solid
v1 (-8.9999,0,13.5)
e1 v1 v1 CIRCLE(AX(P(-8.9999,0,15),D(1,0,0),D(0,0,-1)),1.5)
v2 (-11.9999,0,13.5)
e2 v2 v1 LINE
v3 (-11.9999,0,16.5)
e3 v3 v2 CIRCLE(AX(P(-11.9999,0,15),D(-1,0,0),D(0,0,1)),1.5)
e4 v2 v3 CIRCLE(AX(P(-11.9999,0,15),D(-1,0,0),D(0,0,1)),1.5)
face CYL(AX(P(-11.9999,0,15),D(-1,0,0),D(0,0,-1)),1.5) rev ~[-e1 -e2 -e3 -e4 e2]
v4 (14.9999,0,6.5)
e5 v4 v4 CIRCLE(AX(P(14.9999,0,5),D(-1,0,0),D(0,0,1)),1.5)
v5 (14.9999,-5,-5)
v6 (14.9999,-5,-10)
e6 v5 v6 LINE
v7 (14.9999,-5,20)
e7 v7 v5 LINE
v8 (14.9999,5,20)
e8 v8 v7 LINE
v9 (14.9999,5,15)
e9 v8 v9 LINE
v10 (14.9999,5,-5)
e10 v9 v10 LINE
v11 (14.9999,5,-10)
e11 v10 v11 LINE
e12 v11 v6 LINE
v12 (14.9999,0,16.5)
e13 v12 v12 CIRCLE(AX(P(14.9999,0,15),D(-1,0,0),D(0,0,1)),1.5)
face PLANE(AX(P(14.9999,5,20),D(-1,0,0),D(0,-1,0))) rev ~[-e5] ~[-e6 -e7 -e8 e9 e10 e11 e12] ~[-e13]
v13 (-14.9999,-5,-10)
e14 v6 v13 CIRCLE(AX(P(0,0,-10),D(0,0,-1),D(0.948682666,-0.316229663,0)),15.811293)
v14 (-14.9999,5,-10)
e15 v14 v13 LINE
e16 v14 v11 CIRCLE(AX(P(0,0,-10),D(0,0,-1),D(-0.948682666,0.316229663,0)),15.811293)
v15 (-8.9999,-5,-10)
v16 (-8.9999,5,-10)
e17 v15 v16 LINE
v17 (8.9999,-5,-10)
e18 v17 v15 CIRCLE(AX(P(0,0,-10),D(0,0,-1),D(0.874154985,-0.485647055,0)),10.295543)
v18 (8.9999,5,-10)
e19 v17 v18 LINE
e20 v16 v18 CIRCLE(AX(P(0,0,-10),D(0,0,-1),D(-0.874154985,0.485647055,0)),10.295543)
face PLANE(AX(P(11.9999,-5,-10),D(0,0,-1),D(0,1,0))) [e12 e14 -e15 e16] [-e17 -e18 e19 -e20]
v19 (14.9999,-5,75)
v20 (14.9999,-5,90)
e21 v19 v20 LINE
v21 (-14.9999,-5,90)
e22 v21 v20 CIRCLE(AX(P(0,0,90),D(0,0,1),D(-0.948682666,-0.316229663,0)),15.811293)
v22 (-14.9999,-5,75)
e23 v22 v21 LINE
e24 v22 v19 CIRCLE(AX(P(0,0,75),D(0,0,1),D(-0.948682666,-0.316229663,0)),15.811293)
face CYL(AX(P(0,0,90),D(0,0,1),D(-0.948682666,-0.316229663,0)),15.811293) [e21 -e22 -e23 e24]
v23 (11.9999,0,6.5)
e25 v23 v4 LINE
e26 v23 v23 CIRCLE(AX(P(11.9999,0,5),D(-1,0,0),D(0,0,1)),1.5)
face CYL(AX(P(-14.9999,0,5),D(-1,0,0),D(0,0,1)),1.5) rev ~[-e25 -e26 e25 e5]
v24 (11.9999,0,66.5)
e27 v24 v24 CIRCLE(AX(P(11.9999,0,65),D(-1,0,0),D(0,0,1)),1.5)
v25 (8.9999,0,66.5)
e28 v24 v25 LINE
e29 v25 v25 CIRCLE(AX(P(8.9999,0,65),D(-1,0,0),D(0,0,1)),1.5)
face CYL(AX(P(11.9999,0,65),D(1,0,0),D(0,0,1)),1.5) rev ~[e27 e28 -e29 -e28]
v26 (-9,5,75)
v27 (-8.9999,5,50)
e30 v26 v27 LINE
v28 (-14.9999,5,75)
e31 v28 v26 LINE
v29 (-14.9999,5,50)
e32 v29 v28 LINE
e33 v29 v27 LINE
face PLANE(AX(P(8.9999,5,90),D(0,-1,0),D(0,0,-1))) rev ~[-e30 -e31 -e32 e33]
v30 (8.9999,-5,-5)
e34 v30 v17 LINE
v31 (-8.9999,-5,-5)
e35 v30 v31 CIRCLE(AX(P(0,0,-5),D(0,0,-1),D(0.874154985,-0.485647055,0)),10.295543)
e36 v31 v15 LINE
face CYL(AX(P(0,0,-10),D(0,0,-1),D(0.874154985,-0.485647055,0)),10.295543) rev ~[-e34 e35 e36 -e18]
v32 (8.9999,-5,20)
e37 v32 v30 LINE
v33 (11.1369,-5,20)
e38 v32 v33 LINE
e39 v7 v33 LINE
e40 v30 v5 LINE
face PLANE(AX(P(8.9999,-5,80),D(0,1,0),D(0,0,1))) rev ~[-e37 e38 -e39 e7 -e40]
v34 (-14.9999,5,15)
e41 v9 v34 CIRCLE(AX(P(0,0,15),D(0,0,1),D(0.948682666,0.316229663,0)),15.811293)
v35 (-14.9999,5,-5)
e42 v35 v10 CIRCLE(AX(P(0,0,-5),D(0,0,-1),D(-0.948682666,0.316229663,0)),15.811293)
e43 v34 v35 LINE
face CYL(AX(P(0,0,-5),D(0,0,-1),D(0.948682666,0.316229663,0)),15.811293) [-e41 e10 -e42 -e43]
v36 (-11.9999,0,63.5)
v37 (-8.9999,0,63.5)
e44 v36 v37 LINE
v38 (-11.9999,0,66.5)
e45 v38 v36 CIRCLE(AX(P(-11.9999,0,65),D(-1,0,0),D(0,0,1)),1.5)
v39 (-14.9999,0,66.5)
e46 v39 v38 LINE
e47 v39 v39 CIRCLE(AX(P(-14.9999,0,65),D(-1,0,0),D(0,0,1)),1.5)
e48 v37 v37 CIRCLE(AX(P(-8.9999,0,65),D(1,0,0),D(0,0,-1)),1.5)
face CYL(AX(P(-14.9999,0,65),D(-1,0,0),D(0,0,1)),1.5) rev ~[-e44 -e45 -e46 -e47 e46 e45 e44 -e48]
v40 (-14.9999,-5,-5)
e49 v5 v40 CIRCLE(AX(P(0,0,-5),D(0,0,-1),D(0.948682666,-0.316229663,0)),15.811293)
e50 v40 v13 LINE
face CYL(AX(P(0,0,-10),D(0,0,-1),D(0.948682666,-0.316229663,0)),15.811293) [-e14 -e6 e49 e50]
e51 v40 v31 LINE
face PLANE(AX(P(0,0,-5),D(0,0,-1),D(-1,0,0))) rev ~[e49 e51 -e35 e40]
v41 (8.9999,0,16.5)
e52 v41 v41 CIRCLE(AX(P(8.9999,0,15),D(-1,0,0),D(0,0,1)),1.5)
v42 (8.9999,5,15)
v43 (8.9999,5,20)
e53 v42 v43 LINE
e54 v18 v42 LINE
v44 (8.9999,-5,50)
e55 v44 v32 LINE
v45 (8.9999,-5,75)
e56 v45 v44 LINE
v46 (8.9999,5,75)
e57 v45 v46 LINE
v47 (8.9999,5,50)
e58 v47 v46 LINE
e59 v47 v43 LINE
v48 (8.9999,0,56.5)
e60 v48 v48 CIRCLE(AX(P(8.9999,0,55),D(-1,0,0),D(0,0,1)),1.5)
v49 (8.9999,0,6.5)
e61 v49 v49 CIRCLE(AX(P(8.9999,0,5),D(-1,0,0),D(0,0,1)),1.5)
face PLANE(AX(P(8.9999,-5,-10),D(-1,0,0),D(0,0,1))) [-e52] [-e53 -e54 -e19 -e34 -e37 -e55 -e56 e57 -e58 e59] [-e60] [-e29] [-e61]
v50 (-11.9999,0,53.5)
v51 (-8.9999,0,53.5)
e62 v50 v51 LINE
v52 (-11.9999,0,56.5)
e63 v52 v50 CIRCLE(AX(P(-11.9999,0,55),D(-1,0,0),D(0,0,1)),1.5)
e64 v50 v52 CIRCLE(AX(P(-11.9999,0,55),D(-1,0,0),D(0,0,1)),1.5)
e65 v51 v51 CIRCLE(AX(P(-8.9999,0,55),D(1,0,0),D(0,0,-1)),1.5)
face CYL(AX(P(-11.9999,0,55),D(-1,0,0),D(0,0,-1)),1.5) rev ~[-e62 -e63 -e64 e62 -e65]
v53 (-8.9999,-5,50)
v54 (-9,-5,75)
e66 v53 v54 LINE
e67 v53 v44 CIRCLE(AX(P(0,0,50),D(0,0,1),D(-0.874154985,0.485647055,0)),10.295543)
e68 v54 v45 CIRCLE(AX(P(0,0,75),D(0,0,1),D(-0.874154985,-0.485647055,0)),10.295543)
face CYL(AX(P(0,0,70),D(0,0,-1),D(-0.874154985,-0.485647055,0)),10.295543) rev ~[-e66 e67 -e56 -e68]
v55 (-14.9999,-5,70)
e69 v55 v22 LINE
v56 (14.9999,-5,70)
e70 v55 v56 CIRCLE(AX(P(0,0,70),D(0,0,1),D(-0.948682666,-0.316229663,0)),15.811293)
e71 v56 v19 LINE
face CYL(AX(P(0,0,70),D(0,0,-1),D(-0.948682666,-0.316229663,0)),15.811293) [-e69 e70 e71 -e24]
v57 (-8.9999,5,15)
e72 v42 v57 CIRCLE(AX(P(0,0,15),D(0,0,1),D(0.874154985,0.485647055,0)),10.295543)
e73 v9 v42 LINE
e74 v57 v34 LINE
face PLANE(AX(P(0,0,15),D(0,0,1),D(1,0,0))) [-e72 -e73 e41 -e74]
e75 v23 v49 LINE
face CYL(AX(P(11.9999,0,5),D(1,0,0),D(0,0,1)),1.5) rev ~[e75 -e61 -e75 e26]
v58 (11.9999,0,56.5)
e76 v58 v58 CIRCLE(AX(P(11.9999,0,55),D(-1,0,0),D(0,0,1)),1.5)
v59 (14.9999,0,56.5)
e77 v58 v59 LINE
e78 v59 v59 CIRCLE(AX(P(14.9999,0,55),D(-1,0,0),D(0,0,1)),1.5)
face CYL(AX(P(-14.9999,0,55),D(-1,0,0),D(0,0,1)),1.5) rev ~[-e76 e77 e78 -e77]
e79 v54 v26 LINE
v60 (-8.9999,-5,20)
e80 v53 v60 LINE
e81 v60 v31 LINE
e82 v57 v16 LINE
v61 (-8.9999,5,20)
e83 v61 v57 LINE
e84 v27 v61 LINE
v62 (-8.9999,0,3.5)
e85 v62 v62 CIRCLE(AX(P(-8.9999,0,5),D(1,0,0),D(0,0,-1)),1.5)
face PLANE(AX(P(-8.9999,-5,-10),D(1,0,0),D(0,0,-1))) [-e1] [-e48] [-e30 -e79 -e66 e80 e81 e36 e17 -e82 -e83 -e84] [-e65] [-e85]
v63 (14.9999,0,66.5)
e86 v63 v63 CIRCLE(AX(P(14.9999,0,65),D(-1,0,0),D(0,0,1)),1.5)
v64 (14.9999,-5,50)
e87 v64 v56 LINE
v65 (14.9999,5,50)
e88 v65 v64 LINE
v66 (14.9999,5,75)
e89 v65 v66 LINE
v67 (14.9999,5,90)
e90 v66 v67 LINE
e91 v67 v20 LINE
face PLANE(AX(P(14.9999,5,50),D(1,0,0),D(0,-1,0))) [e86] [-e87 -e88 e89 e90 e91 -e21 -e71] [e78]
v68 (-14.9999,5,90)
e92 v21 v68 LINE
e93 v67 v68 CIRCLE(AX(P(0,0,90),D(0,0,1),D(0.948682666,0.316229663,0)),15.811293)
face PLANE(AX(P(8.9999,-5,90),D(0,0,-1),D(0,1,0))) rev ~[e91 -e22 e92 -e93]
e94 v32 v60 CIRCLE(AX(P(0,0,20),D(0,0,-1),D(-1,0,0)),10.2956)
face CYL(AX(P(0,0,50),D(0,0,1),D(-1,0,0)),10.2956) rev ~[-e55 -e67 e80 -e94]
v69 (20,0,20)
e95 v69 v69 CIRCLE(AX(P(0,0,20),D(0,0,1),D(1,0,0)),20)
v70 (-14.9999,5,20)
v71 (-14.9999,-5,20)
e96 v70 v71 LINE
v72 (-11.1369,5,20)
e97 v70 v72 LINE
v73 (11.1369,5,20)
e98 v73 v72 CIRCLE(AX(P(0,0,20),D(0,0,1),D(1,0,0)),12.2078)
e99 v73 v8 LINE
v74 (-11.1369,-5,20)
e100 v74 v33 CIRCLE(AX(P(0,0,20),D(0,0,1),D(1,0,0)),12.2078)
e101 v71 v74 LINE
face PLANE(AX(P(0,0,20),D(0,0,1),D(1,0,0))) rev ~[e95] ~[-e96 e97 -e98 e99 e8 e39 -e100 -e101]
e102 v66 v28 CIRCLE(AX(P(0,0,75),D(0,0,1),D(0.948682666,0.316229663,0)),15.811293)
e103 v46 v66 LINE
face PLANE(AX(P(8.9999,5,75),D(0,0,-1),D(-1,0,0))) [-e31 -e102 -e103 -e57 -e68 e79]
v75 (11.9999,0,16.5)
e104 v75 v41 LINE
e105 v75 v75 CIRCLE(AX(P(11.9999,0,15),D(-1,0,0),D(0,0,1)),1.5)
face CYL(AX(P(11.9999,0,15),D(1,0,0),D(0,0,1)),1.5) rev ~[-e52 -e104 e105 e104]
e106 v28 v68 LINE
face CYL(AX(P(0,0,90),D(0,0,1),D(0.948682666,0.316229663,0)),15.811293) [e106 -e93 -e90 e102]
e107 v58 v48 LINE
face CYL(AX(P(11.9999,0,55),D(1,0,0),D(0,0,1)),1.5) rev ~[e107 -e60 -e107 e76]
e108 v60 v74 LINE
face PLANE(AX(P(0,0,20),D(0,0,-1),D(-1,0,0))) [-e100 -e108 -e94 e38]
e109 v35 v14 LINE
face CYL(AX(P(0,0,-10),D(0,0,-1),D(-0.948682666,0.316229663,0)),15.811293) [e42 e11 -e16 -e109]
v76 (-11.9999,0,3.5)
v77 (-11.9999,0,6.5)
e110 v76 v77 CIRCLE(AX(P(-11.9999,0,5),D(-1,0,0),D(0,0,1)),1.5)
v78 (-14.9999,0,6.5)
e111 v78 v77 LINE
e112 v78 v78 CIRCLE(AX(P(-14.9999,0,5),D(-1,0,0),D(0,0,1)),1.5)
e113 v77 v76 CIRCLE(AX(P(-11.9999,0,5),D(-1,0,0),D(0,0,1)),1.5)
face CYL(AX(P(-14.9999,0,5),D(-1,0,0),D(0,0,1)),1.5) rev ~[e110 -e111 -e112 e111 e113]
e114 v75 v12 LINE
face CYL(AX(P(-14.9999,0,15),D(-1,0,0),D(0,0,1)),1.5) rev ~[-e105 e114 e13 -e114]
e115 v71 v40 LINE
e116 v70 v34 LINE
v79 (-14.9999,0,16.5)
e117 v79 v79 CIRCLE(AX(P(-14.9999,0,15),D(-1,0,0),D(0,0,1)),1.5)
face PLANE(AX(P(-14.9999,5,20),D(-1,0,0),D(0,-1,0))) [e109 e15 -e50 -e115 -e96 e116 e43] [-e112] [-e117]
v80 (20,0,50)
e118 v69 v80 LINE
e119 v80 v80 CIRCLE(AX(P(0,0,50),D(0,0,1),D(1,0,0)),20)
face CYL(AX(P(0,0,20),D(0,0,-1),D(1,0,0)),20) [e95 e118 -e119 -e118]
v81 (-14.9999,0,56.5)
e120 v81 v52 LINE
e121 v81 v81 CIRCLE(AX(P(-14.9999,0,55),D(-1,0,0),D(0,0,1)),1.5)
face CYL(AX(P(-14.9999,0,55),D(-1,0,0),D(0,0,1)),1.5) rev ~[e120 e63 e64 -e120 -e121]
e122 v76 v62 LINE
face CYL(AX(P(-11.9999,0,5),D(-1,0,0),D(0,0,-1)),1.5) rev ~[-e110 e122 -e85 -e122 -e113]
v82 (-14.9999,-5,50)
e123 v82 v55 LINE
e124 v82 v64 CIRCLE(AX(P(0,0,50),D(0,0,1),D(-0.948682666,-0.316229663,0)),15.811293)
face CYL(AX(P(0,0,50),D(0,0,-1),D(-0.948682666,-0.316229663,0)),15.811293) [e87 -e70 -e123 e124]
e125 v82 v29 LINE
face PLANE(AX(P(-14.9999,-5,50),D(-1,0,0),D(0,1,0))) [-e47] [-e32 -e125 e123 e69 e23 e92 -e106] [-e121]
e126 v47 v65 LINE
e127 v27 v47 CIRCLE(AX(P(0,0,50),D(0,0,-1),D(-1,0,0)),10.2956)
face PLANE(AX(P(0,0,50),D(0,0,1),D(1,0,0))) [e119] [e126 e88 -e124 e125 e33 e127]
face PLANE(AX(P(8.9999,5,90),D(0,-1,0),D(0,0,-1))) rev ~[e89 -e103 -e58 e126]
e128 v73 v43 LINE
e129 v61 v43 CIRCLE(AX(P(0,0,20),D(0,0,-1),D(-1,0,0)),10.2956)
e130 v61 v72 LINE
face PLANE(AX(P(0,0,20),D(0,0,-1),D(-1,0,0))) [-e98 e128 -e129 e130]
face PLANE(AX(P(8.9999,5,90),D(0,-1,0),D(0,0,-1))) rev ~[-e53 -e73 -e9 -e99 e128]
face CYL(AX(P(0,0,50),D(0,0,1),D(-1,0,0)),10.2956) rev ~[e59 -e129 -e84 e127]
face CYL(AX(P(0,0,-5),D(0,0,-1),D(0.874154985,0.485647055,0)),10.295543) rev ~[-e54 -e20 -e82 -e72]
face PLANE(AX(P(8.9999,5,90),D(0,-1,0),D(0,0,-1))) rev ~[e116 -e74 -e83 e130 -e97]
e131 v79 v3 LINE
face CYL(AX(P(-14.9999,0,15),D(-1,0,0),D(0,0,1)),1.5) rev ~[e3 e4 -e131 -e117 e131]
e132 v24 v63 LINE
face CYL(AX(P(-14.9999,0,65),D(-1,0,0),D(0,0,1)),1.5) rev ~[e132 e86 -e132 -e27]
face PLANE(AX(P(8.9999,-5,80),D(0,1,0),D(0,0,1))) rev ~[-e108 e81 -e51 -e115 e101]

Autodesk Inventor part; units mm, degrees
ref_plane "YZ Plane" through (0, 0, 0) normal (1, 0, 0) x (0, 1, 0)
ref_plane "XZ Plane" through (0, 0, 0) normal (0, 1, 0) x (-1, 0, 0)
ref_plane "XY Plane" through (0, 0, 0) normal (0, 0, 1) x (1, 0, 0)
ref_plane "Work Plane2" through (0, 0, 20) normal (0, 0, 1) x (1, 0, 0)
sketch "Sketch3" plane through (0, 0, 20) normal (0, 0, 1) x (1, 0, 0)
  line L0 (-11.1369, 5) -> (-11.1369, -5)
  line L1 (-11.1369, 5) -> (-14.9999, 5)
  line L2 (-14.9999, 5) -> (-14.9999, -5)
  line L3 (-14.9999, -5) -> (-11.1369, -5)
  line L4 (-11.1369, -5) -> (-11.1369, 5)
  line L5 (11.1369, 5) -> (14.9999, 5)
  line L6 (14.9999, 5) -> (14.9999, -5)
  line L7 (14.9999, -5) -> (11.1369, -5)
  line L8 (11.1369, -5) -> (11.1369, 5)
  point P0 (0, 0)
  point P1 (0, 0)
  dimension "d9" = 3.863
  dimension "d10" = 3.863
extrude "Extrusion3" add sketch "Sketch3" against normal blind 30
sketch "Sketch4" plane through (-14.9999, -5, 20) normal (-1, 0, 0) x (0, 0, 1)
  line L0 (0, 5) -> (0, 0)
  circle A0 centre (-15, 5) radius 1.5
  circle A1 centre (-5, 5) radius 1.5
  point P0 (-20, 5)
  dimension "d13" = 5
  dimension "d14" = 5
  dimension "d17" = 3
  dimension "d18" = 3
extrude "Extrusion4" cut sketch "Sketch4" against normal blind 200
sketch "Sketch5" plane through (0, 0, 20) normal (0, 0, 1) x (1, 0, 0)
  circle A0 centre (0, 0) radius 20
  circle A1 centre (0, 0) radius 12.2078
  point P0 (-14.9999, 5)
  point P1 (-11.1369, -5)
  point P2 (11.1369, -5)
  point P3 (14.9999, 5)
  dimension "d21" = 40
extrude "Extrusion5" add sketch "Sketch5" along normal blind 30
sketch "Sketch6" plane through (0, 0, 20) normal (0, 0, 1) x (1, 0, 0)
  line L0 (-14.9999, -5) -> (-11.1369, -5) projected
  line L1 (-14.9999, 5) -> (-11.1369, 5) projected
  line L2 (-11.1369, -5) -> (-13.4979, -5)
  line L3 (-13.4979, -5) -> (-13.4979, 5)
  line L4 (-13.4979, 5) -> (-11.1369, 5)
  line L5 (-11.1369, 5) -> (-11.1369, -5)
  line L6 (11.1369, -5) -> (11.1369, 5) projected
  line L7 (11.1369, -5) -> (13.9529, -5)
  line L8 (13.9529, -5) -> (13.9529, 5)
  line L9 (13.9529, 5) -> (11.1369, 5)
  line L10 (11.1369, 5) -> (11.1369, -5)
  arc A0 (11.1369, 5) -> (-11.1369, 5) centre (0, 0) ccw projected
  arc A1 (-11.1369, -5) -> (11.1369, -5) centre (0, 0) ccw projected
  arc A2 (-11.1369, 5) -> (-11.1369, -5) centre (0, 0) ccw
  line L11 (14.9999, -5) -> (11.1369, -5) projected
  line L12 (11.1369, 5) -> (14.9999, 5) projected
  arc A3 (11.1369, -5) -> (11.1369, 5) centre (0, 0) ccw
extrude "Extrusion6" add sketch "Sketch6" along normal blind 30 contours A2 L5 | L6 A3
sketch "Sketch7" plane through (0, 0, 50) normal (0, 0, 1) x (1, 0, 0)
  line L0 (-14.9999, -5) -> (-11.1369, -5) projected
  line L1 (-14.9999, 5) -> (-11.1369, 5) projected
  line L2 (-11.1369, -5) -> (-14.9999, -5)
  line L3 (-14.9999, -5) -> (-14.9999, 5)
  line L4 (-14.9999, 5) -> (-11.1369, 5)
  line L5 (-11.1369, 5) -> (-11.1369, -5)
  arc A0 (-11.1369, -5) -> (11.1369, -5) centre (0, 0) ccw projected
  line L6 (14.9999, 5) -> (14.9999, -5) projected
  line L7 (11.1369, -5) -> (14.9999, -5)
  line L8 (14.9999, -5) -> (14.9999, 5)
  line L9 (14.9999, 5) -> (11.1369, 5)
  line L10 (11.1369, 5) -> (11.1369, -5)
extrude "Extrusion7" add sketch "Sketch7" along normal blind 40
sketch "Sketch8" plane through (-14.9999, -5, 50) normal (-1, 0, 0) x (0, 0, 1)
  circle A0 centre (15, 5) radius 1.5
  circle A1 centre (5, 5) radius 1.5
  point P0 (-50, 5)
  point P1 (40, 0)
  dimension "d31" = 3
  dimension "d32" = 3
extrude "Extrusion8" cut sketch "Sketch8" against normal blind 200
sketch "Sketch10" plane through (0, 0, -10) normal (0, 0, -1) x (-1, 0, 0)
  line L0 (11.1369, -5) -> (11.1369, 5) projected
  line L1 (11.1369, -5) -> (11.9999, -5)
  line L2 (11.9999, -5) -> (11.9999, -3.8424)
  line L3 (11.9999, -3.8424) -> (11.1369, -3.8424)
  line L4 (11.1369, -3.8424) -> (11.1369, -5)
  line L5 (11.9999, -3.8424) -> (11.1369, -3.8424)
  line L6 (11.1369, -3.8424) -> (11.1369, 5)
  line L7 (11.1369, 5) -> (11.9999, 5)
  line L8 (11.9999, 5) -> (11.9999, -3.8424)
  line L9 (-14.9999, -5) -> (-11.1369, -5) projected
  line L10 (-11.1369, 5) -> (-14.9999, 5) projected
  line L11 (-11.1369, -5) -> (-11.9999, -5)
  line L12 (-11.9999, -5) -> (-11.9999, 5)
  line L13 (-11.9999, 5) -> (-11.1369, 5)
  line L14 (-11.1369, 5) -> (-11.1369, -5)
  point P0 (0, 0)
  dimension "d35" = 0.863
  dimension "d36" = 0.863
extrude "Extrusion9" cut sketch "Sketch10" against normal blind 200
sketch "Sketch11" plane through (0, 0, 50) normal (0, 0, 1) x (1, 0, 0)
  line L0 (-11.9999, -5) -> (-11.1369, -5) projected
  line L1 (-11.1369, -5) -> (-11.9999, -5)
  line L2 (-11.9999, -5) -> (-11.9999, 5)
  line L3 (-11.9999, 5) -> (-11.1369, 5)
  line L4 (-11.1369, 5) -> (-11.1369, -5)
  line L5 (11.9999, -5) -> (11.1369, -5) projected
  line L6 (11.9999, 5) -> (14.9999, 5) projected
  line L7 (11.1369, -5) -> (11.9999, -5)
  line L8 (11.9999, -5) -> (11.9999, 5)
  line L9 (11.9999, 5) -> (11.1369, 5)
  line L10 (11.1369, 5) -> (11.1369, -5)
  point P0 (0, 0)
extrude "Extrusion10" add sketch "Sketch11" against normal blind 30
sketch "Sketch12" plane through (11.9999, -5, -10) normal (-1, 0, 0) x (0, 0, 1)
  line L0 (100, 10) -> (100, 0) projected
  line L1 (0, 10) -> (100, 10)
  line L2 (100, 10) -> (100, 0)
  line L3 (100, 0) -> (0, 0)
  line L4 (0, 0) -> (0, 10)
  circle A0 centre (65, 5) radius 1.5 projected
  circle A1 centre (65, 5) radius 1.5
  circle A2 centre (75, 5) radius 1.5 projected
  circle A3 centre (75, 5) radius 1.5
  circle A4 centre (25, 5) radius 1.5 projected
  circle A5 centre (25, 5) radius 1.5
  circle A6 centre (15, 5) radius 1.5 projected
  circle A7 centre (15, 5) radius 1.5
  point P0 (30, 0)
extrude "Extrusion11" add sketch "Sketch12" along normal blind 3
sketch "Sketch13" plane through (-11.9999, -5, -10) normal (1, 0, 0) x (0, 0, -1)
  line L0 (-30, 10) -> (0, 10) projected
  line L1 (-100, 0) -> (-100, 10) projected
  line L2 (0, 10) -> (-100, 10)
  line L3 (-100, 10) -> (-100, 0)
  line L4 (-100, 0) -> (0, 0)
  line L5 (0, 0) -> (0, 10)
  circle A0 centre (-65, 5) radius 1.5 projected
  circle A1 centre (-65, 5) radius 1.5
  circle A2 centre (-75, 5) radius 1.5 projected
  circle A3 centre (-75, 5) radius 1.5
  circle A4 centre (-15, 5) radius 1.5 projected
  circle A5 centre (-15, 5) radius 1.5
  circle A6 centre (-25, 5) radius 1.5 projected
  circle A7 centre (-25, 5) radius 1.5
  point P0 (-10, 5)
extrude "Extrusion12" add sketch "Sketch13" along normal blind 3
sketch "Sketch14" plane through (0, 0, -10) normal (0, 0, -1) x (-1, 0, 0)
  line L0 (14.9999, -5) -> (14.9999, 5) projected
  line L1 (8.9999, -5) -> (8.9999, 5) projected
  line L2 (8.9999, -5) -> (14.9999, -5) projected
  line L3 (14.9999, 5) -> (8.9999, 5) projected
  arc A0 (8.9999, 5) -> (-8.9999, 5) centre (0, 0) ccw
  arc A1 (-8.9999, -5) -> (8.9999, -5) centre (0, 0) ccw
  arc A2 (14.9999, 5) -> (-14.9999, 5) centre (0, 0) ccw
  arc A3 (-14.9999, -5) -> (14.9999, -5) centre (0, 0) ccw
  line L4 (14.9999, 5) -> (8.9999, 5)
  line L5 (-8.9999, 5) -> (-14.9999, 5)
  line L6 (14.9999, -5) -> (8.9999, -5)
  line L7 (-8.9999, -5) -> (-14.9999, -5)
extrude "Extrusion13" add sketch "Sketch14" against normal blind 5
sketch "Sketch19" plane through (0, 0, -5) normal (0, 0, 1) x (1, 0, 0)
  arc A0 (8.9999, 5) -> (-8.9999, 5) centre (0, 0) ccw
  arc A1 (14.9999, 5) -> (-14.9999, 5) centre (0, 0) ccw
  line L0 (14.9999, 5) -> (8.9999, 5)
  line L1 (-8.9999, 5) -> (-14.9999, 5)
  point P0 (8.9999, 5)
extrude "Extrusion17" add sketch "Sketch19" along normal blind 20
sketch "Sketch20" plane through (8.9999, -5, -10) normal (-1, 0, 0) x (0, 0, 1)
  line L0 (100, 10) -> (25, 10) projected
  line L1 (5, 0) -> (100, 0) projected
  line L2 (100, 10) -> (90, 10)
  line L3 (90, 10) -> (90, 0)
  line L4 (90, 0) -> (100, 0)
  line L5 (100, 0) -> (100, 10)
  point P0 (10, 5)
  dimension "d62" = 10
extrude "Extrusion18" add sketch "Sketch20" along normal blind 20
sketch "Sketch21" plane through (11.1369, -5, 20) normal (0, -1, 0) x (1, 0, 0)
  line L0 (-20.1369, -5) -> (-20.1369, 60) projected
  line L1 (-20.1369, 55) -> (-20.1369, 55)
  line L2 (-15.1369, 60) -> (-15.1369, 60)
  line L3 (-2.137, 60) -> (-20.1369, 60) projected
  line L4 (-2.137, 60) -> (-2.137, -5) projected
  line L5 (-7.137, 60) -> (-7.137, 60)
  line L6 (-2.137, 55) -> (-2.137, 55)
  arc A0 (-15.1369, 60) -> (-20.1369, 55) centre (-15.1369, 55) ccw
  arc A1 (-2.137, 55) -> (-7.137, 60) centre (-7.137, 55) ccw
  line L7 (-20.1369, 55) -> (-20.1369, 60)
  line L8 (-15.1369, 60) -> (-20.1369, 60)
  line L9 (-7.137, 60) -> (-2.137, 60)
  line L10 (-2.137, 60) -> (-2.137, 55)
  point P0 (-11.1369, -20)
  dimension "d65" = 5
  dimension "d66" = 5
  dimension "d67" = 5
  dimension "d68" = 5
  dimension "d69" = 5
extrude "Extrusion19" add sketch "Sketch21" against normal blind 10
sketch "Sketch22" plane through (0, 0, 50) normal (0, 0, 1) x (1, 0, 0)
  arc A0 (14.9999, 5) -> (-14.9999, 5) centre (0, 0) ccw projected
  arc A1 (-14.9999, -5) -> (14.9999, -5) centre (0, 0) ccw
  arc A2 (-8.9999, 5) -> (8.9999, 5) centre (0, 0) ccw
  line L0 (14.9999, 5) -> (-14.9999, 5) projected
  line L1 (-14.9999, 5) -> (14.9999, 5)
  line L2 (-11.1369, -5) -> (-14.9999, -5) projected
  arc A3 (-14.9999, -5) -> (14.9999, -5) centre (0, 0) ccw projected
  line L3 (-14.9999, -5) -> (-8.9999, -5)
  line L4 (8.9999, -5) -> (14.9999, -5)
extrude "Extrusion20" add sketch "Sketch22" along normal blind 20 contours L4 A1 L2 L3 A2
sketch "Sketch23" plane through (0, 0, 50) normal (0, 0, -1) x (-1, 0, 0)
  arc A0 (-11.1369, -5) -> (11.1369, -5) centre (0, 0) ccw projected
  circle A1 centre (0, 0) radius 12.2078
  line L0 (8.9999, 5) -> (8.9999, -5) projected
  circle A2 centre (0, 0) radius 10.2956
  line L1 (8.9999, -5) -> (11.1369, -5) projected
  line L2 (-11.1369, 5) -> (-14.9999, 5) projected
  arc A3 (11.1369, 5) -> (-11.1369, 5) centre (0, 0) ccw projected
  line L3 (11.1369, -5) -> (8.9999, -5)
  line L4 (-8.9999, -5) -> (-11.1369, -5)
  line L5 (-11.1369, 5) -> (-8.9999, 5)
  line L6 (8.9999, 5) -> (11.1369, 5)
extrude "Extrusion21" add sketch "Sketch23" along normal blind 30 contours L4 A2 L1 A0 | A1 L6 A2 L5
sketch "Sketch24" plane through (-14.9999, 5, 90) normal (0, 1, 0) x (1, 0, 0)
  point P0 (14.9999, 90)
sketch "Sketch25" plane through (0, 0, 90) normal (0, 0, 1) x (1, 0, 0)
  arc A0 (-14.9999, -5) -> (14.9999, -5) centre (0, 0) ccw projected
  line L0 (-8.9999, 5) -> (-8.9999, -5) projected
  line L1 (14.9999, 5) -> (-14.9999, 5) projected
  line L2 (14.9999, 5) -> (-14.9999, 5)
  line L3 (-14.9999, -5) -> (-8.9999, -5) projected
  line L4 (14.9999, -5) -> (-14.9999, -5)
  arc A1 (-14.9999, -5) -> (14.9999, -5) centre (0, 0) ccw
  arc A2 (14.9999, 5) -> (-14.9999, 5) centre (0, 0) ccw
extrude "Extrusion22" add sketch "Sketch25" against normal blind 15
sketch "Sketch26" plane through (8.9999, 5, 50) normal (0, 1, 0) x (1, 0, 0)
  arc A0 (-5, -30) -> (0, -25) centre (-5, -25) ccw projected
  line L0 (0, -25) -> (-17.9999, -25)
  line L1 (-12.9999, -30) -> (-5, -30)
  arc A1 (-5, -30) -> (0, -25) centre (-5, -25) ccw
  line L2 (-23.9999, -25) -> (-17.9999, -25) projected
  arc A2 (-17.9999, -25) -> (-12.9999, -30) centre (-12.9999, -25) ccw
  line L3 (-5, -30) -> (-12.9999, -30)
  point P0 (-8.9999, 50)
extrude "Extrusion23" add sketch "Sketch26" against normal blind 10
sketch "Sketch28" plane through (0, 0, 70) normal (0, 0, 1) x (1, 0, 0)
  line L0 (-14.8626, -5) -> (-8.9999, -5)
  line L1 (8.9999, -5) -> (14.9999, -5) projected
  line L2 (8.9999, -5) -> (14.9999, -5)
  arc A0 (-14.9999, -5) -> (14.9999, -5) centre (0, 0) ccw
  line L3 (-14.9999, -5) -> (-8.9999, -5) projected
  line L4 (-14.8626, -5) -> (-14.9999, -5)
  arc A1 (-8.9999, -5) -> (8.9999, -5) centre (0, 0) ccw
  point P0 (0, 0)
extrude "Extrusion24" add sketch "Sketch28" along normal blind 5
properties part number "Part2_abbGripp"
